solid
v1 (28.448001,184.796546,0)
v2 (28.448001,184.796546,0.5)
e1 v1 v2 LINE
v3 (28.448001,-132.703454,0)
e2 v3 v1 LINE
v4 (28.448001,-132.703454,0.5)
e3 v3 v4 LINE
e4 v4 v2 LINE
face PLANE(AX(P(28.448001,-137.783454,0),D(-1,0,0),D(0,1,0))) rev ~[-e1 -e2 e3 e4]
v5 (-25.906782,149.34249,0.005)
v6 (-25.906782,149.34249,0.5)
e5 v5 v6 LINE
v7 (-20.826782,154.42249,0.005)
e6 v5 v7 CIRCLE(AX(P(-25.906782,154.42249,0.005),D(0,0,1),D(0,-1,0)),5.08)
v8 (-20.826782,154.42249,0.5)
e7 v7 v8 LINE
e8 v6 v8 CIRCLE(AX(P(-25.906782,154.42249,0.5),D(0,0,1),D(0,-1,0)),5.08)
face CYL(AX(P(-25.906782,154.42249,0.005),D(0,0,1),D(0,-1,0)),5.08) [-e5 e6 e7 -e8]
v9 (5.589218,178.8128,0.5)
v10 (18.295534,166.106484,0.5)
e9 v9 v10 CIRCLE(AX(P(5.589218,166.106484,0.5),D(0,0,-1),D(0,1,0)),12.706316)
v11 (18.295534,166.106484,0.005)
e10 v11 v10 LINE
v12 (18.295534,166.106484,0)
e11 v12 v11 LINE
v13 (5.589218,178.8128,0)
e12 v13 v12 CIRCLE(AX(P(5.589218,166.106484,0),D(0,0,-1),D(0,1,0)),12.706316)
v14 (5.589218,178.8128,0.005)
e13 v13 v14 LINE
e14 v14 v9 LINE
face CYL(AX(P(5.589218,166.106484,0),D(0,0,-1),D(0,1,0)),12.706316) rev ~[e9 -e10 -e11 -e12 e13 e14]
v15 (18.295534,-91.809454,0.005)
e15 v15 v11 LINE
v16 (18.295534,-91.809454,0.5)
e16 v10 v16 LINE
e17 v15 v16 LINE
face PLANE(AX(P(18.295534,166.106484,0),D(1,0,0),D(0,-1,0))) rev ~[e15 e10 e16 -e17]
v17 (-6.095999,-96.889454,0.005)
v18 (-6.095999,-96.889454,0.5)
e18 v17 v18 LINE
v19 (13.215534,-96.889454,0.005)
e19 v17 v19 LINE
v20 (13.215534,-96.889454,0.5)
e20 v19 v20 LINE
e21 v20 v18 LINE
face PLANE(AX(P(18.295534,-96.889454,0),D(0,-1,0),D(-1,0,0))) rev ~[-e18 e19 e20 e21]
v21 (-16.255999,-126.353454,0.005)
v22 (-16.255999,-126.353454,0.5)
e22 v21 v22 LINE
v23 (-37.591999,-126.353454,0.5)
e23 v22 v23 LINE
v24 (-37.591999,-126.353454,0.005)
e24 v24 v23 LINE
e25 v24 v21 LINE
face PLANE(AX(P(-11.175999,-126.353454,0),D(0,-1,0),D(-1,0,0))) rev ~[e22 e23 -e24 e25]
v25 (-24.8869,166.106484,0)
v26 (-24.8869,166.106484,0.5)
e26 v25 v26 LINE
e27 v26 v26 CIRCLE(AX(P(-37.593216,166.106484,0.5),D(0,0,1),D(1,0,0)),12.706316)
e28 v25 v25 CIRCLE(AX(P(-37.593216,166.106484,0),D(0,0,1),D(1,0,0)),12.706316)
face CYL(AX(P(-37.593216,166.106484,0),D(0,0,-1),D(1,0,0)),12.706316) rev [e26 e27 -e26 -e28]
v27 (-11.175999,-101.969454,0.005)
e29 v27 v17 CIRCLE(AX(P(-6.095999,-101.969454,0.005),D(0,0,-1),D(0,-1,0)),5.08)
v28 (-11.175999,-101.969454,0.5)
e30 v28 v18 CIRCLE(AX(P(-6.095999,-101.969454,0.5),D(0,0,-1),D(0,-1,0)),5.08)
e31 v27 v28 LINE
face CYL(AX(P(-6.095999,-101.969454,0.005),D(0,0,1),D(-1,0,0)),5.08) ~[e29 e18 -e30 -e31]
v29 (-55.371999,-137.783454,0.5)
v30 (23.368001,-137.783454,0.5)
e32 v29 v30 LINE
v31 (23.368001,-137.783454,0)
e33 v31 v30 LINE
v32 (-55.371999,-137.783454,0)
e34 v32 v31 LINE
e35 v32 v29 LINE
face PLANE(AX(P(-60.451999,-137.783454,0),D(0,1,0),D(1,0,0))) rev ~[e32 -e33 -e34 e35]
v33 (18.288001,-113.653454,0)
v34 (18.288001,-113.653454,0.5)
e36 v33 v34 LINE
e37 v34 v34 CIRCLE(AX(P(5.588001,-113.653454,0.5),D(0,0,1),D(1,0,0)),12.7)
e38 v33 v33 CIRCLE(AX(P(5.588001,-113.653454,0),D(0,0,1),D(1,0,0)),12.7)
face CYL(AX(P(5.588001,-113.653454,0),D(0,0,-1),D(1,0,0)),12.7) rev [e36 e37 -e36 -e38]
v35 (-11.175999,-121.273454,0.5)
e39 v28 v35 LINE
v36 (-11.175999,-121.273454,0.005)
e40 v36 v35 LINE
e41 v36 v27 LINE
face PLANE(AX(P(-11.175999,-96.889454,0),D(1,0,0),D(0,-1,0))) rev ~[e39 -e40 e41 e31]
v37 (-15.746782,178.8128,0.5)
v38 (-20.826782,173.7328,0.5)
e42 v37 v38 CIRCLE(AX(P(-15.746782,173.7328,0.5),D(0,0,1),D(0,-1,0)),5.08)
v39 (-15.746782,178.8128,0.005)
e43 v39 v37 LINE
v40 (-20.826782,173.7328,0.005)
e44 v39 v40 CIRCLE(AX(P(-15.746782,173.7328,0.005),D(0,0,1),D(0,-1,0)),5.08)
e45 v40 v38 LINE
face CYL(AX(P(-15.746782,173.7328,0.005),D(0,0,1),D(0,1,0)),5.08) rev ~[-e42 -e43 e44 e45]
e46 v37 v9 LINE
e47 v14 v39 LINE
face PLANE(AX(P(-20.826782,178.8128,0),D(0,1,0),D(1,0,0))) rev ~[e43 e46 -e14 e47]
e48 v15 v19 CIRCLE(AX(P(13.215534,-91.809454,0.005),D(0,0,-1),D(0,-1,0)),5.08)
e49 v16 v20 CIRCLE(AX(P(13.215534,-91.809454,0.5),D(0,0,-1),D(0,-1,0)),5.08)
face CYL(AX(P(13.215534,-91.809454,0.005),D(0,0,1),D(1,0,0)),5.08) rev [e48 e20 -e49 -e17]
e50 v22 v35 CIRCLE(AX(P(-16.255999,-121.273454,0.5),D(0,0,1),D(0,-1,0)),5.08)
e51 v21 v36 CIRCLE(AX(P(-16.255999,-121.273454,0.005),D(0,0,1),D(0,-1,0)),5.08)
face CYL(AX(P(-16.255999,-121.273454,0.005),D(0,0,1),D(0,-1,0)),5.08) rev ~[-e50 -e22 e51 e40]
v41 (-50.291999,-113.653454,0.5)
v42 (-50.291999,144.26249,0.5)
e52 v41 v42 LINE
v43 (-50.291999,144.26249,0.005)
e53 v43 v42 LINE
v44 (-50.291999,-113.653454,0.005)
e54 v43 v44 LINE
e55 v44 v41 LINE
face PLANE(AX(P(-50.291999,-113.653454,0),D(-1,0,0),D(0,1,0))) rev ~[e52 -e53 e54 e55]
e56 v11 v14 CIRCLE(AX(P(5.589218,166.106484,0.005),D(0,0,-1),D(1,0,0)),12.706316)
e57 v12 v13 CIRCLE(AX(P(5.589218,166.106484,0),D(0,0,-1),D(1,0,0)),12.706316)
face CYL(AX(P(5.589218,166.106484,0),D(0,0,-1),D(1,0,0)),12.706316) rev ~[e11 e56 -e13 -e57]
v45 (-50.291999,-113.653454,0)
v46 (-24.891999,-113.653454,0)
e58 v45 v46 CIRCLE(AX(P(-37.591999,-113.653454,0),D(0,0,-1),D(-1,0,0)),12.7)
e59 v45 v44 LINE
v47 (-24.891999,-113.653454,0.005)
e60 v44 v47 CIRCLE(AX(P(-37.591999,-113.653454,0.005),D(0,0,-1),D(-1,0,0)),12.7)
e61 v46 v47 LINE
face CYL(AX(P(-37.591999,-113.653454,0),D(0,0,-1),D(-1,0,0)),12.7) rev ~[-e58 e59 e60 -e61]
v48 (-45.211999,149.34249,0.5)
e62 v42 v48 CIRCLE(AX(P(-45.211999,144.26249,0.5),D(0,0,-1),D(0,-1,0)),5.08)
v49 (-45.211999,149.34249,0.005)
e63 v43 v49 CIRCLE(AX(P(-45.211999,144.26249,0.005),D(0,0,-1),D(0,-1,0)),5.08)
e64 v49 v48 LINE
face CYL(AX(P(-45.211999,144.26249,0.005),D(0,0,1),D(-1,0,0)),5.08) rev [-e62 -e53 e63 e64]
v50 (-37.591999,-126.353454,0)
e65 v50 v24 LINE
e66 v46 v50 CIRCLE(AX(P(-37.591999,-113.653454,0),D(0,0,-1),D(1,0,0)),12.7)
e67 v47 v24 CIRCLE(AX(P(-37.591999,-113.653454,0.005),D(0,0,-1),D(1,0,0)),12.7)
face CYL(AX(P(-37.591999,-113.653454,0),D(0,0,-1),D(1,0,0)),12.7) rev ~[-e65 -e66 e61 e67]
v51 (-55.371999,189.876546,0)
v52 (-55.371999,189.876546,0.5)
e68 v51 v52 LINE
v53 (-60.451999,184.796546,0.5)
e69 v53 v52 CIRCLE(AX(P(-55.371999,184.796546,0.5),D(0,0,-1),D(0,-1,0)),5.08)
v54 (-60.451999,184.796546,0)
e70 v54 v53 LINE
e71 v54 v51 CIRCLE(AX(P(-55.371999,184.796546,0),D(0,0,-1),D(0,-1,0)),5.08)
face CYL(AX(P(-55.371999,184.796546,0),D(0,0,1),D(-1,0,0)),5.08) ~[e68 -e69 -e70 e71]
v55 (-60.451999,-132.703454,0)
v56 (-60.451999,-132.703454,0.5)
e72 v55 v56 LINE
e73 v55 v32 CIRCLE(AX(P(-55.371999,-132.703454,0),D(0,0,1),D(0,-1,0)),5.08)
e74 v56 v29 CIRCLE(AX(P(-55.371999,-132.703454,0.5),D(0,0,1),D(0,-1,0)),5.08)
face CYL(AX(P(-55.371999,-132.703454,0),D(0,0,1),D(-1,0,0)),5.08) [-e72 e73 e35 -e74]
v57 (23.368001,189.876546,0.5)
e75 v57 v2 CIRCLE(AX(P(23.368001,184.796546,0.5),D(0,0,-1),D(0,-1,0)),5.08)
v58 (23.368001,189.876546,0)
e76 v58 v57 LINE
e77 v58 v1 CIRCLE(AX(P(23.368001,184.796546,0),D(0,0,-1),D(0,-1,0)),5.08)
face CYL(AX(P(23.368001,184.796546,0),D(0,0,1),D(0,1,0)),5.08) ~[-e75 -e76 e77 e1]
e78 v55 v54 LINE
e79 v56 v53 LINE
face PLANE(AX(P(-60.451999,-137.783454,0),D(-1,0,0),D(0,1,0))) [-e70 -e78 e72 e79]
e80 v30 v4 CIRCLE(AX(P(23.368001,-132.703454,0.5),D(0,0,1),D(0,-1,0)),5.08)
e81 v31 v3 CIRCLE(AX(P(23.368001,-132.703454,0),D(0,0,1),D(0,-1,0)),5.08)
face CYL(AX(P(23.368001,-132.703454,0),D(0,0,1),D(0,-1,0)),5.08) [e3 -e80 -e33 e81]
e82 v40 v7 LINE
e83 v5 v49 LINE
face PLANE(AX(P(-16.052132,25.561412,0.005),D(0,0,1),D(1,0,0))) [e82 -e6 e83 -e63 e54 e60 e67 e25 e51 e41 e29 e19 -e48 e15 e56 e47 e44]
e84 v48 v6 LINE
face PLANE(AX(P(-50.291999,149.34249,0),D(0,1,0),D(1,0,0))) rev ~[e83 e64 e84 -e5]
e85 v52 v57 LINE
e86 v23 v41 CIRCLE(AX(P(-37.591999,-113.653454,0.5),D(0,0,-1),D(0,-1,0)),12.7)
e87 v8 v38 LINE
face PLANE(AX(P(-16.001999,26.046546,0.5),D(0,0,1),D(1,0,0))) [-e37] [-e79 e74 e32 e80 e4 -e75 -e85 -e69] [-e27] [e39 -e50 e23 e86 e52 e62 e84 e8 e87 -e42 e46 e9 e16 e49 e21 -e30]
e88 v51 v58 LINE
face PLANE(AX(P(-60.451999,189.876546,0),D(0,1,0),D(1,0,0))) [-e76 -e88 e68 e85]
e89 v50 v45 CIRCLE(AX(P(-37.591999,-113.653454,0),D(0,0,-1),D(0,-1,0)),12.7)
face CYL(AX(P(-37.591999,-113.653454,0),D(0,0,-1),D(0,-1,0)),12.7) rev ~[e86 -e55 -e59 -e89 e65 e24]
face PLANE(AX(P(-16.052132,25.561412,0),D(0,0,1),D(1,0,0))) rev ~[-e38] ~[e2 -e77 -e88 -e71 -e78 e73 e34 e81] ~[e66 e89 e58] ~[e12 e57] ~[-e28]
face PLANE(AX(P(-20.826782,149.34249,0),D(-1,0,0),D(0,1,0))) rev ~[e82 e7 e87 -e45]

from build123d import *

# Parameters (mm, degrees)
F0_W     = 88.9
F0_H     = 327.66
F0_R     = 12.7
F0_R_2   = 12.7063161154
F1_DEPTH = 0.5
F2_DEPTH = 0.005
F3_R     = 5.08
F4_R     = 5.08


# Not quite as in the source:
# - a feature names something its author has since deleted; it is built from what else it names


with BuildPart() as f1:
    # F0 (on Top) → F1 (new body)
    with BuildSketch(Plane.XY):
        with Locations((-16.0019993782, 26.0465461761)):
            Rectangle(F0_W, F0_H)
        with Locations((5.5880006218, -113.6534538239)):
            Circle(F0_R, mode=Mode.SUBTRACT)
        with Locations((-37.5932163954, 166.1064843748)):
            Circle(F0_R_2, mode=Mode.SUBTRACT)
        with BuildLine():
            ThreePointArc((5.589217639, 178.8128004902), (14.573939928, 175.0912066639), (18.2955337543, 166.1064843748))
            Line((18.2955337543, 166.1064843748), (18.2955337543, -96.8894538239))
            Line((18.2955337543, -96.8894538239), (-11.1759993782, -96.8894538239))
            Line((-11.1759993782, -96.8894538239), (-11.1759993782, -126.3534538239))
            Line((-11.1759993782, -126.3534538239), (-37.5919993782, -126.3534538239))
            ThreePointArc((-37.5919993782, -126.3534538239), (-46.5722554993, -122.633709945), (-50.2919993782, -113.6534538239))
            Line((-50.2919993782, -113.6534538239), (-50.2919993782, 149.3424895761))
            Line((-50.2919993782, 149.3424895761), (-20.826782361, 149.3424895761))
            Line((-20.826782361, 149.3424895761), (-20.826782361, 178.8128004902))
            Line((-20.826782361, 178.8128004902), (5.589217639, 178.8128004902))
        make_face(mode=Mode.SUBTRACT)
    extrude(amount=F1_DEPTH)

    # F0 (on Top) → F2 (join)
    with BuildSketch(Plane.XY):
        with BuildLine():
            Line((18.2955337543, -96.8894538239), (18.2955337543, 166.1064843748))
            ThreePointArc((18.2955337543, 166.1064843748), (-3.3955046501, 157.1217620858), (5.589217639, 178.8128004902))
            Line((5.589217639, 178.8128004902), (-20.826782361, 178.8128004902))
            Line((-20.826782361, 178.8128004902), (-20.826782361, 149.3424895761))
            Line((-20.826782361, 149.3424895761), (-50.2919993782, 149.3424895761))
            Line((-50.2919993782, 149.3424895761), (-50.2919993782, -113.6534538239))
            ThreePointArc((-50.2919993782, -113.6534538239), (-37.5919993782, -100.9534538239), (-24.8919993782, -113.6534538239))
            ThreePointArc((-24.8919993782, -113.6534538239), (-28.6117432571, -122.633709945), (-37.5919993782, -126.3534538239))
            Line((-37.5919993782, -126.3534538239), (-11.1759993782, -126.3534538239))
            Line((-11.1759993782, -126.3534538239), (-11.1759993782, -96.8894538239))
            Line((-11.1759993782, -96.8894538239), (18.2955337543, -96.8894538239))
        make_face()
    extrude(amount=F2_DEPTH)

    # F3
    f3_edges = [f1.edges().sort_by_distance(p)[0] for p in [
        (28.448001, 189.876546, 0.25),
        (-60.451999, 189.876546, 0.25),
        (-60.451999, -137.783454, 0.25),
        (28.448001, -137.783454, 0.25),
        (18.295534, -96.889454, 0.2525),
        (-11.175999, -96.889454, 0.2525),
        (-11.175999, -126.353454, 0.2525),
    ]]
    fillet(f3_edges, radius=F3_R)

    # F4
    f4_edges = [f1.edges().sort_by_distance(p)[0] for p in [
        (-20.826782, 149.34249, 0.2525),
        (-50.291999, 149.34249, 0.2525),
        (-20.826782, 178.8128, 0.2525),
    ]]
    fillet(f4_edges, radius=F4_R)


solid = f1.part
